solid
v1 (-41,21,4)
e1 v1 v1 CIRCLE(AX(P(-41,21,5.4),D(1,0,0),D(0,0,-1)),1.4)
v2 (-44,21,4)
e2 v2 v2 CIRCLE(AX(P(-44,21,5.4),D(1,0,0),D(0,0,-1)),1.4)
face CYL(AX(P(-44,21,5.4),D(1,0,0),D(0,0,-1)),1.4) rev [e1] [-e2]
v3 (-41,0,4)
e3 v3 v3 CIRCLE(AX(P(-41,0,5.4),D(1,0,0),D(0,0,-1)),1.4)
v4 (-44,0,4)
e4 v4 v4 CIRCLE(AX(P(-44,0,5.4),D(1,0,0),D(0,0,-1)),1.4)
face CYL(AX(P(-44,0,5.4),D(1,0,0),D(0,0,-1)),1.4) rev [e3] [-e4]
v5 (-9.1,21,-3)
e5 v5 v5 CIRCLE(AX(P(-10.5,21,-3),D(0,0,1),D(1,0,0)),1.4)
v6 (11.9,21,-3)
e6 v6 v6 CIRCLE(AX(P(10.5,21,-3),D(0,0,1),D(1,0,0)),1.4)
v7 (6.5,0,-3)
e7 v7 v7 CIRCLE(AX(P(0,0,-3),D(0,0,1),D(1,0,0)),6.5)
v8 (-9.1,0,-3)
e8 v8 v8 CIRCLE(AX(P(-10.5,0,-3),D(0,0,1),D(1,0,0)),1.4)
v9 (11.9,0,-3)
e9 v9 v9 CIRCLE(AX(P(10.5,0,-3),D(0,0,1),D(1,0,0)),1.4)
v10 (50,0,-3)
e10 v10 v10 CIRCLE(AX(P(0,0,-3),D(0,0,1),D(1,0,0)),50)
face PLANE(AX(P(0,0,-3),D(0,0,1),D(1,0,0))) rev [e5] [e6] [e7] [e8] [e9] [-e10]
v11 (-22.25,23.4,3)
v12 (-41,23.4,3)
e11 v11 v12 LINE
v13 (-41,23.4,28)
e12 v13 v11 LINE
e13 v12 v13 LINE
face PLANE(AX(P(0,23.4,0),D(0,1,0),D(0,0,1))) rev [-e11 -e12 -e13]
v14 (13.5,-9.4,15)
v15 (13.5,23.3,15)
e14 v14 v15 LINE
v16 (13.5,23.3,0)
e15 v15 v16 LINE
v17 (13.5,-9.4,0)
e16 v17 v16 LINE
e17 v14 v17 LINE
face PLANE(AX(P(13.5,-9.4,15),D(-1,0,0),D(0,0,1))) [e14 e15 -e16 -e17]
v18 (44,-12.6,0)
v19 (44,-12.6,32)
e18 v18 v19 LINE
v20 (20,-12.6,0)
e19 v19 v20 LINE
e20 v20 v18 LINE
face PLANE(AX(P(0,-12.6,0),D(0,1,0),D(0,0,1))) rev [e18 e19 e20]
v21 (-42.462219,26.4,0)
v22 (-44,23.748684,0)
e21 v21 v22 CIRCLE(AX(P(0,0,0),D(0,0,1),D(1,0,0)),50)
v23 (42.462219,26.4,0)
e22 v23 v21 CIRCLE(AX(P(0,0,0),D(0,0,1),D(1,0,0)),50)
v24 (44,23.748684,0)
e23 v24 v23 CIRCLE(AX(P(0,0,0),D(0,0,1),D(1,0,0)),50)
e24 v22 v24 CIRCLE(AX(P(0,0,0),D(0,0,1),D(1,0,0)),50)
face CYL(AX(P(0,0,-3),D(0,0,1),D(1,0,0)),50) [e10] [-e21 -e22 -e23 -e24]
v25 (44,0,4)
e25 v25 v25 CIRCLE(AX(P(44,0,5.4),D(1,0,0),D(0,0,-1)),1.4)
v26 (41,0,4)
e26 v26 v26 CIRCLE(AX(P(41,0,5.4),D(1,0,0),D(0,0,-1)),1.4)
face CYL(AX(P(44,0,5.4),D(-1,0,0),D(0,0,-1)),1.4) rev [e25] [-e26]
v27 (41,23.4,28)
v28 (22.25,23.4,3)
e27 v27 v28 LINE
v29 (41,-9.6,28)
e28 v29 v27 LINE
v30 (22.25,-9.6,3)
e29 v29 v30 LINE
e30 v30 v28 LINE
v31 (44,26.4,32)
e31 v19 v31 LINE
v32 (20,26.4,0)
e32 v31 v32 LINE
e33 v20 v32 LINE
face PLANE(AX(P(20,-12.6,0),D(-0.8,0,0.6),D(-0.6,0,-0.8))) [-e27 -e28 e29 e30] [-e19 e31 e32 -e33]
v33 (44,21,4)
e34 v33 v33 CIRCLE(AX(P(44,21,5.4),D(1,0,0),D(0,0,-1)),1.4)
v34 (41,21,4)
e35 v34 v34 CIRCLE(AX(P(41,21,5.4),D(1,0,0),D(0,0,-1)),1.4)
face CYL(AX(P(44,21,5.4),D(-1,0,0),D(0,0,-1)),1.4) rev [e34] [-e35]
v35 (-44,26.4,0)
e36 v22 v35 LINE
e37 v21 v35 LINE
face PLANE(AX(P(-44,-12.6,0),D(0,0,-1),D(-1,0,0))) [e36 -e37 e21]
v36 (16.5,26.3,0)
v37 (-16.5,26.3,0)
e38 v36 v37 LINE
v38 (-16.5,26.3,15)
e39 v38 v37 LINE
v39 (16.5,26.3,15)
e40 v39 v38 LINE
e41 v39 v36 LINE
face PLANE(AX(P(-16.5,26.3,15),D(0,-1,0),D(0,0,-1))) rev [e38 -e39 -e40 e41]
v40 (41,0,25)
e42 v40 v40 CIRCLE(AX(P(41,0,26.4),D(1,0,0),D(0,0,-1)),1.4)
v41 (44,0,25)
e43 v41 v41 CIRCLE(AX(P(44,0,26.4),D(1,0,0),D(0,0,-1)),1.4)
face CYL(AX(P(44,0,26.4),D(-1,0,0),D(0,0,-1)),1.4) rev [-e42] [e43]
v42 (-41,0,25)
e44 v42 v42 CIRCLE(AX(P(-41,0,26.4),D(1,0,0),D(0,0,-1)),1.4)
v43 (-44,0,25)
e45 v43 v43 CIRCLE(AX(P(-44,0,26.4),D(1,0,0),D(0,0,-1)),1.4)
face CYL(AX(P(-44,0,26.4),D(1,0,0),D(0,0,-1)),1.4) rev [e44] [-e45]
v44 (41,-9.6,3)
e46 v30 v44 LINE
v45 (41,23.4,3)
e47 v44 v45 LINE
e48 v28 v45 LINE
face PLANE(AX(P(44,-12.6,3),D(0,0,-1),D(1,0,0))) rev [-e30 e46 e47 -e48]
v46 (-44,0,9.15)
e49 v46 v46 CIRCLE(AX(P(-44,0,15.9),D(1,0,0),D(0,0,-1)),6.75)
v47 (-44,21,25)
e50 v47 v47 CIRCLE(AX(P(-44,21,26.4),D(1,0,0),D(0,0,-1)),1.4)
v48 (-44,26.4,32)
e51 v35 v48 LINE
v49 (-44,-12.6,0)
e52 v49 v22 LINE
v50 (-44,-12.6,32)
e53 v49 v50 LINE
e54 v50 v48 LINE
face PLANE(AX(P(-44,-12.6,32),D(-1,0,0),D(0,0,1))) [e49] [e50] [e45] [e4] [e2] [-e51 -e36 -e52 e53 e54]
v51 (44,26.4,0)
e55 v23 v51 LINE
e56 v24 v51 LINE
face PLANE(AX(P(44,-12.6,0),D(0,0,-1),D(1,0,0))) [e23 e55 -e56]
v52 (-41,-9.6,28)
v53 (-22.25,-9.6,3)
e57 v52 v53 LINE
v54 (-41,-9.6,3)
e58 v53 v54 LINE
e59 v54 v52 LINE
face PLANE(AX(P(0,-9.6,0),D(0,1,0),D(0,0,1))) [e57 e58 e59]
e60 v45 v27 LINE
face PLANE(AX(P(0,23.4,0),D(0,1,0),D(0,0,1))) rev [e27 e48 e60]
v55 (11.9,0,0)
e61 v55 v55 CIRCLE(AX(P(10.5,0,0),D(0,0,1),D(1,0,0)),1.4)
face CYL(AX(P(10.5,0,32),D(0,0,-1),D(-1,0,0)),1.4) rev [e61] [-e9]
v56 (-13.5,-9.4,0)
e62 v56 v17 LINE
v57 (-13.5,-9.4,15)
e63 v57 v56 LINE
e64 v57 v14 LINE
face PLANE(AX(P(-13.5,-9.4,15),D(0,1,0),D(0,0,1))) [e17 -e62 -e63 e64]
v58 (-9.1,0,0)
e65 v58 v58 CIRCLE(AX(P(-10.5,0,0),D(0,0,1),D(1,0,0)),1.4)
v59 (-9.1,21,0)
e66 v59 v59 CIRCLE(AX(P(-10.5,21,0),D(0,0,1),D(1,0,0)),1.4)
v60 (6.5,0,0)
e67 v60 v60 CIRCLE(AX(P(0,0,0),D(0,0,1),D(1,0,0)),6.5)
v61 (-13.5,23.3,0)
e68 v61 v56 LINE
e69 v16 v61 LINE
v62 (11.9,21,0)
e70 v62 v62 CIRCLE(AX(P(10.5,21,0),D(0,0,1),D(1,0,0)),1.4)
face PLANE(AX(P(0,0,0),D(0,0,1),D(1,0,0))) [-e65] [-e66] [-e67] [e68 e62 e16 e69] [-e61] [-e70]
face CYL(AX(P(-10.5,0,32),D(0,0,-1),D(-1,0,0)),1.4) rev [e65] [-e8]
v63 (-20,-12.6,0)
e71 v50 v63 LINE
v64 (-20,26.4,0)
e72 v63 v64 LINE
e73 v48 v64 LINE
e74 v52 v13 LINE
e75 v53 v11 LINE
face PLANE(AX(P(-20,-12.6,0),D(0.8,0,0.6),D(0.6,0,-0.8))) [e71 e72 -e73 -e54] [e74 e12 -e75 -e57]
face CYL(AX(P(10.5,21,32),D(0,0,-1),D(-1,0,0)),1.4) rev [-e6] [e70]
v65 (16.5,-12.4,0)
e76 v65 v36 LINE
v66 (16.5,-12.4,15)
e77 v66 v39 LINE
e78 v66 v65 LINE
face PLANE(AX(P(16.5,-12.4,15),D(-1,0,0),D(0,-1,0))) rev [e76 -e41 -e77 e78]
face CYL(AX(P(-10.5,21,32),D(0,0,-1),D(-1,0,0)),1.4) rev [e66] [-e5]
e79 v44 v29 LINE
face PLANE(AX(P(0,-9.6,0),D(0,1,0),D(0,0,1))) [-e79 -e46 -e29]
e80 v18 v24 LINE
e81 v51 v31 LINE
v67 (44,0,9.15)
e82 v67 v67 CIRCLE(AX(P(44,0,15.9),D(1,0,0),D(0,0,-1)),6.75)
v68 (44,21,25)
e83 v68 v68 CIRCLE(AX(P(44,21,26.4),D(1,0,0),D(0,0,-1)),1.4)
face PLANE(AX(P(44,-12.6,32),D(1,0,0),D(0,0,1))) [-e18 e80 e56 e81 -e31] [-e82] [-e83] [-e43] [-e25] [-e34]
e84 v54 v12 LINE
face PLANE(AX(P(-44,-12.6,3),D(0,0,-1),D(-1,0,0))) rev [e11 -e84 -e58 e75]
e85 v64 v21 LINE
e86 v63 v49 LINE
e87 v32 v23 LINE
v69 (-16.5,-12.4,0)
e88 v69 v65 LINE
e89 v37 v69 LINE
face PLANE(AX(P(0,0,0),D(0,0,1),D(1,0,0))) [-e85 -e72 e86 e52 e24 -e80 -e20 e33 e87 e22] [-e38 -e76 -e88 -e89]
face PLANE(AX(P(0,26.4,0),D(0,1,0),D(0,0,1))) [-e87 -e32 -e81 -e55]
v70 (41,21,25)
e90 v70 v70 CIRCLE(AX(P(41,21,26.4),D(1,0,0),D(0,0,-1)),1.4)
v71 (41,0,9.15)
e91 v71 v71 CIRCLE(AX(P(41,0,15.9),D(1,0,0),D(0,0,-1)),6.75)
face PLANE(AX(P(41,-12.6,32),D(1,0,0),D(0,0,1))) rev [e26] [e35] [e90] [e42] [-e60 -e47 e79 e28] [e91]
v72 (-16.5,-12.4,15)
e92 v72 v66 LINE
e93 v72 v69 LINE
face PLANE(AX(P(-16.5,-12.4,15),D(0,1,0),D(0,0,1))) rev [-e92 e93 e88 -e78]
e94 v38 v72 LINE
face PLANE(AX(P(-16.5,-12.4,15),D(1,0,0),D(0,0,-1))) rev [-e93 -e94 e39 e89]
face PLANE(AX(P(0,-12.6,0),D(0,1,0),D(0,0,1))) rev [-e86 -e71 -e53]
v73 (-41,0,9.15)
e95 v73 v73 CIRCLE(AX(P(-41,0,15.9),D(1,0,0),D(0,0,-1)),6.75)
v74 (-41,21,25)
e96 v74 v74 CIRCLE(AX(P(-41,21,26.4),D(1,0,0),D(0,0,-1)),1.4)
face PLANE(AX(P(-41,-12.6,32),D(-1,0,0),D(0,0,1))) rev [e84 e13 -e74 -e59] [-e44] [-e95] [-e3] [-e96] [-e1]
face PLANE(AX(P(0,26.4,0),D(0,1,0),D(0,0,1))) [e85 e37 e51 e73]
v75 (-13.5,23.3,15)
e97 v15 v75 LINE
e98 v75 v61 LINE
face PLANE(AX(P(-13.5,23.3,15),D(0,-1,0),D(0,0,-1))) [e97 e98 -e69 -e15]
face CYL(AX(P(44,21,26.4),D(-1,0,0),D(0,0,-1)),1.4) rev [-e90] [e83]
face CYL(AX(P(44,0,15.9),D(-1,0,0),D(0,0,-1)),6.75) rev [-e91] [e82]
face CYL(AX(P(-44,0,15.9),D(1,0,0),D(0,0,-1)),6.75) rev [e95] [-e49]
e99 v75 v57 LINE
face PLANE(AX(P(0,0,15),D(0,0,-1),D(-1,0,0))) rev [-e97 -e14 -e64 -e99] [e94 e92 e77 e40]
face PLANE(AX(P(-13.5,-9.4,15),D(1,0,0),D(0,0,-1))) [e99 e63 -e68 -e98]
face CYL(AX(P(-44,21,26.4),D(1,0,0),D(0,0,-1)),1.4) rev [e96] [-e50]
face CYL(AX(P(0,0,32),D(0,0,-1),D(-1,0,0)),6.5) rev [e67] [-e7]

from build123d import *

# Parameters (mm, degrees)
EXTRUDE_START            = 26.4
EXTRUDE_3_DEPTH          = 39
SHELL_2_T                = -3
SKETCH_7_R               = 6.75
SKETCH_7_R_2             = 1.4
CUT_EXTRUDE_5_DEPTH      = 47.496881616
SKETCH_1_R               = 50
EXTRUDE_1_DEPTH          = 3
SKETCH_9_W               = 33
SKETCH_9_H               = 38.7
SKETCH_9_W_2             = 27
SKETCH_9_H_2             = 32.7
EXTRUDE_5_DEPTH          = 15
CUT_EXTRUDE_8_DEPTH      = 79.89866919
CUT_EXTRUDE_8_DEPTH_BACK = 79.89866919
SKETCH_8_R               = 1.4
SKETCH_8_R_2             = 6.5


# Read off the part's stored shape, not the designer's step: ﾐﾗｰ1
with BuildPart() as part:
    # ｽｹｯﾁ5 → ﾎﾞｽ - 押し出し3 (new body)
    with BuildSketch(Plane(origin=(0, 0, 0), x_dir=(1, 0, 0), z_dir=(0, 1, 0)).offset(EXTRUDE_START)):
        Polygon((-44, -32), (-44, 0), (-20, 0), align=None)
    extrude(amount=-EXTRUDE_3_DEPTH)

    # ｼｪﾙ2
    shell_2_openings = [part.faces().sort_by_distance(p)[0] for p in [
        (-32, 6.9, 16),
    ]]
    offset(amount=SHELL_2_T, openings=shell_2_openings, kind=Kind.INTERSECTION)

    # ｽｹｯﾁ7 → ｶｯﾄ - 押し出し5 (cut, through all)
    with BuildSketch(Plane(origin=(-41, 0, 0), x_dir=(0, 0, -1), z_dir=(1, 0, 0))):
        with Locations((-15.9, 0)):
            Circle(SKETCH_7_R)
        with Locations((-26.4, 0)):
            Circle(SKETCH_7_R_2)
        with Locations((-5.4, 0)):
            Circle(SKETCH_7_R_2)
        with Locations((-5.4, 21)):
            Circle(SKETCH_7_R_2)
        with Locations((-26.4, 21)):
            Circle(SKETCH_7_R_2)
    extrude(amount=-CUT_EXTRUDE_5_DEPTH, mode=Mode.SUBTRACT)

    # ｽｹｯﾁ1 → ﾎﾞｽ - 押し出し1 (add)
    with BuildSketch(Plane.XY):
        Circle(SKETCH_1_R)
    extrude(amount=-EXTRUDE_1_DEPTH)

    # ﾐﾗｰ1: part across plane


with BuildPart() as part_1:
    add(part.part)
    add(part.part.mirror(Plane(origin=(0, 0, 0), x_dir=(0, 0, 1), z_dir=(1, 0, 0))))

    # ｽｹｯﾁ9 → ﾎﾞｽ - 押し出し5 (add)
    with BuildSketch(Plane.XY):
        with Locations((0, 6.95)):
            Rectangle(SKETCH_9_W, SKETCH_9_H)
        with Locations((0, 6.95)):
            Rectangle(SKETCH_9_W_2, SKETCH_9_H_2, mode=Mode.SUBTRACT)
    extrude(amount=EXTRUDE_5_DEPTH)

    # ｽｹｯﾁ8 → ｶｯﾄ - 押し出し8 (cut, two sides: drawn at the far end of the back side and taken through both)
    with BuildSketch(Plane(origin=(0, 0, -3), x_dir=(-1, 0, 0), z_dir=(0, 0, -1)).offset(-CUT_EXTRUDE_8_DEPTH_BACK)):
        with Locations(Location((-10.5, 21, 0), (0, 0, 180))):
            Circle(SKETCH_8_R)
        with Locations(Location((10.5, 21, 0), (0, 0, 180))):
            Circle(SKETCH_8_R)
        with Locations(Location((-10.5, 0, 0), (0, 0, 180))):
            Circle(SKETCH_8_R)
        with Locations(Location((10.5, 0, 0), (0, 0, 180))):
            Circle(SKETCH_8_R)
        with Locations(Location((0, 0, 0), (0, 0, 180))):
            Circle(SKETCH_8_R_2)
    extrude(amount=CUT_EXTRUDE_8_DEPTH + CUT_EXTRUDE_8_DEPTH_BACK, mode=Mode.SUBTRACT)


solid = part_1.part
